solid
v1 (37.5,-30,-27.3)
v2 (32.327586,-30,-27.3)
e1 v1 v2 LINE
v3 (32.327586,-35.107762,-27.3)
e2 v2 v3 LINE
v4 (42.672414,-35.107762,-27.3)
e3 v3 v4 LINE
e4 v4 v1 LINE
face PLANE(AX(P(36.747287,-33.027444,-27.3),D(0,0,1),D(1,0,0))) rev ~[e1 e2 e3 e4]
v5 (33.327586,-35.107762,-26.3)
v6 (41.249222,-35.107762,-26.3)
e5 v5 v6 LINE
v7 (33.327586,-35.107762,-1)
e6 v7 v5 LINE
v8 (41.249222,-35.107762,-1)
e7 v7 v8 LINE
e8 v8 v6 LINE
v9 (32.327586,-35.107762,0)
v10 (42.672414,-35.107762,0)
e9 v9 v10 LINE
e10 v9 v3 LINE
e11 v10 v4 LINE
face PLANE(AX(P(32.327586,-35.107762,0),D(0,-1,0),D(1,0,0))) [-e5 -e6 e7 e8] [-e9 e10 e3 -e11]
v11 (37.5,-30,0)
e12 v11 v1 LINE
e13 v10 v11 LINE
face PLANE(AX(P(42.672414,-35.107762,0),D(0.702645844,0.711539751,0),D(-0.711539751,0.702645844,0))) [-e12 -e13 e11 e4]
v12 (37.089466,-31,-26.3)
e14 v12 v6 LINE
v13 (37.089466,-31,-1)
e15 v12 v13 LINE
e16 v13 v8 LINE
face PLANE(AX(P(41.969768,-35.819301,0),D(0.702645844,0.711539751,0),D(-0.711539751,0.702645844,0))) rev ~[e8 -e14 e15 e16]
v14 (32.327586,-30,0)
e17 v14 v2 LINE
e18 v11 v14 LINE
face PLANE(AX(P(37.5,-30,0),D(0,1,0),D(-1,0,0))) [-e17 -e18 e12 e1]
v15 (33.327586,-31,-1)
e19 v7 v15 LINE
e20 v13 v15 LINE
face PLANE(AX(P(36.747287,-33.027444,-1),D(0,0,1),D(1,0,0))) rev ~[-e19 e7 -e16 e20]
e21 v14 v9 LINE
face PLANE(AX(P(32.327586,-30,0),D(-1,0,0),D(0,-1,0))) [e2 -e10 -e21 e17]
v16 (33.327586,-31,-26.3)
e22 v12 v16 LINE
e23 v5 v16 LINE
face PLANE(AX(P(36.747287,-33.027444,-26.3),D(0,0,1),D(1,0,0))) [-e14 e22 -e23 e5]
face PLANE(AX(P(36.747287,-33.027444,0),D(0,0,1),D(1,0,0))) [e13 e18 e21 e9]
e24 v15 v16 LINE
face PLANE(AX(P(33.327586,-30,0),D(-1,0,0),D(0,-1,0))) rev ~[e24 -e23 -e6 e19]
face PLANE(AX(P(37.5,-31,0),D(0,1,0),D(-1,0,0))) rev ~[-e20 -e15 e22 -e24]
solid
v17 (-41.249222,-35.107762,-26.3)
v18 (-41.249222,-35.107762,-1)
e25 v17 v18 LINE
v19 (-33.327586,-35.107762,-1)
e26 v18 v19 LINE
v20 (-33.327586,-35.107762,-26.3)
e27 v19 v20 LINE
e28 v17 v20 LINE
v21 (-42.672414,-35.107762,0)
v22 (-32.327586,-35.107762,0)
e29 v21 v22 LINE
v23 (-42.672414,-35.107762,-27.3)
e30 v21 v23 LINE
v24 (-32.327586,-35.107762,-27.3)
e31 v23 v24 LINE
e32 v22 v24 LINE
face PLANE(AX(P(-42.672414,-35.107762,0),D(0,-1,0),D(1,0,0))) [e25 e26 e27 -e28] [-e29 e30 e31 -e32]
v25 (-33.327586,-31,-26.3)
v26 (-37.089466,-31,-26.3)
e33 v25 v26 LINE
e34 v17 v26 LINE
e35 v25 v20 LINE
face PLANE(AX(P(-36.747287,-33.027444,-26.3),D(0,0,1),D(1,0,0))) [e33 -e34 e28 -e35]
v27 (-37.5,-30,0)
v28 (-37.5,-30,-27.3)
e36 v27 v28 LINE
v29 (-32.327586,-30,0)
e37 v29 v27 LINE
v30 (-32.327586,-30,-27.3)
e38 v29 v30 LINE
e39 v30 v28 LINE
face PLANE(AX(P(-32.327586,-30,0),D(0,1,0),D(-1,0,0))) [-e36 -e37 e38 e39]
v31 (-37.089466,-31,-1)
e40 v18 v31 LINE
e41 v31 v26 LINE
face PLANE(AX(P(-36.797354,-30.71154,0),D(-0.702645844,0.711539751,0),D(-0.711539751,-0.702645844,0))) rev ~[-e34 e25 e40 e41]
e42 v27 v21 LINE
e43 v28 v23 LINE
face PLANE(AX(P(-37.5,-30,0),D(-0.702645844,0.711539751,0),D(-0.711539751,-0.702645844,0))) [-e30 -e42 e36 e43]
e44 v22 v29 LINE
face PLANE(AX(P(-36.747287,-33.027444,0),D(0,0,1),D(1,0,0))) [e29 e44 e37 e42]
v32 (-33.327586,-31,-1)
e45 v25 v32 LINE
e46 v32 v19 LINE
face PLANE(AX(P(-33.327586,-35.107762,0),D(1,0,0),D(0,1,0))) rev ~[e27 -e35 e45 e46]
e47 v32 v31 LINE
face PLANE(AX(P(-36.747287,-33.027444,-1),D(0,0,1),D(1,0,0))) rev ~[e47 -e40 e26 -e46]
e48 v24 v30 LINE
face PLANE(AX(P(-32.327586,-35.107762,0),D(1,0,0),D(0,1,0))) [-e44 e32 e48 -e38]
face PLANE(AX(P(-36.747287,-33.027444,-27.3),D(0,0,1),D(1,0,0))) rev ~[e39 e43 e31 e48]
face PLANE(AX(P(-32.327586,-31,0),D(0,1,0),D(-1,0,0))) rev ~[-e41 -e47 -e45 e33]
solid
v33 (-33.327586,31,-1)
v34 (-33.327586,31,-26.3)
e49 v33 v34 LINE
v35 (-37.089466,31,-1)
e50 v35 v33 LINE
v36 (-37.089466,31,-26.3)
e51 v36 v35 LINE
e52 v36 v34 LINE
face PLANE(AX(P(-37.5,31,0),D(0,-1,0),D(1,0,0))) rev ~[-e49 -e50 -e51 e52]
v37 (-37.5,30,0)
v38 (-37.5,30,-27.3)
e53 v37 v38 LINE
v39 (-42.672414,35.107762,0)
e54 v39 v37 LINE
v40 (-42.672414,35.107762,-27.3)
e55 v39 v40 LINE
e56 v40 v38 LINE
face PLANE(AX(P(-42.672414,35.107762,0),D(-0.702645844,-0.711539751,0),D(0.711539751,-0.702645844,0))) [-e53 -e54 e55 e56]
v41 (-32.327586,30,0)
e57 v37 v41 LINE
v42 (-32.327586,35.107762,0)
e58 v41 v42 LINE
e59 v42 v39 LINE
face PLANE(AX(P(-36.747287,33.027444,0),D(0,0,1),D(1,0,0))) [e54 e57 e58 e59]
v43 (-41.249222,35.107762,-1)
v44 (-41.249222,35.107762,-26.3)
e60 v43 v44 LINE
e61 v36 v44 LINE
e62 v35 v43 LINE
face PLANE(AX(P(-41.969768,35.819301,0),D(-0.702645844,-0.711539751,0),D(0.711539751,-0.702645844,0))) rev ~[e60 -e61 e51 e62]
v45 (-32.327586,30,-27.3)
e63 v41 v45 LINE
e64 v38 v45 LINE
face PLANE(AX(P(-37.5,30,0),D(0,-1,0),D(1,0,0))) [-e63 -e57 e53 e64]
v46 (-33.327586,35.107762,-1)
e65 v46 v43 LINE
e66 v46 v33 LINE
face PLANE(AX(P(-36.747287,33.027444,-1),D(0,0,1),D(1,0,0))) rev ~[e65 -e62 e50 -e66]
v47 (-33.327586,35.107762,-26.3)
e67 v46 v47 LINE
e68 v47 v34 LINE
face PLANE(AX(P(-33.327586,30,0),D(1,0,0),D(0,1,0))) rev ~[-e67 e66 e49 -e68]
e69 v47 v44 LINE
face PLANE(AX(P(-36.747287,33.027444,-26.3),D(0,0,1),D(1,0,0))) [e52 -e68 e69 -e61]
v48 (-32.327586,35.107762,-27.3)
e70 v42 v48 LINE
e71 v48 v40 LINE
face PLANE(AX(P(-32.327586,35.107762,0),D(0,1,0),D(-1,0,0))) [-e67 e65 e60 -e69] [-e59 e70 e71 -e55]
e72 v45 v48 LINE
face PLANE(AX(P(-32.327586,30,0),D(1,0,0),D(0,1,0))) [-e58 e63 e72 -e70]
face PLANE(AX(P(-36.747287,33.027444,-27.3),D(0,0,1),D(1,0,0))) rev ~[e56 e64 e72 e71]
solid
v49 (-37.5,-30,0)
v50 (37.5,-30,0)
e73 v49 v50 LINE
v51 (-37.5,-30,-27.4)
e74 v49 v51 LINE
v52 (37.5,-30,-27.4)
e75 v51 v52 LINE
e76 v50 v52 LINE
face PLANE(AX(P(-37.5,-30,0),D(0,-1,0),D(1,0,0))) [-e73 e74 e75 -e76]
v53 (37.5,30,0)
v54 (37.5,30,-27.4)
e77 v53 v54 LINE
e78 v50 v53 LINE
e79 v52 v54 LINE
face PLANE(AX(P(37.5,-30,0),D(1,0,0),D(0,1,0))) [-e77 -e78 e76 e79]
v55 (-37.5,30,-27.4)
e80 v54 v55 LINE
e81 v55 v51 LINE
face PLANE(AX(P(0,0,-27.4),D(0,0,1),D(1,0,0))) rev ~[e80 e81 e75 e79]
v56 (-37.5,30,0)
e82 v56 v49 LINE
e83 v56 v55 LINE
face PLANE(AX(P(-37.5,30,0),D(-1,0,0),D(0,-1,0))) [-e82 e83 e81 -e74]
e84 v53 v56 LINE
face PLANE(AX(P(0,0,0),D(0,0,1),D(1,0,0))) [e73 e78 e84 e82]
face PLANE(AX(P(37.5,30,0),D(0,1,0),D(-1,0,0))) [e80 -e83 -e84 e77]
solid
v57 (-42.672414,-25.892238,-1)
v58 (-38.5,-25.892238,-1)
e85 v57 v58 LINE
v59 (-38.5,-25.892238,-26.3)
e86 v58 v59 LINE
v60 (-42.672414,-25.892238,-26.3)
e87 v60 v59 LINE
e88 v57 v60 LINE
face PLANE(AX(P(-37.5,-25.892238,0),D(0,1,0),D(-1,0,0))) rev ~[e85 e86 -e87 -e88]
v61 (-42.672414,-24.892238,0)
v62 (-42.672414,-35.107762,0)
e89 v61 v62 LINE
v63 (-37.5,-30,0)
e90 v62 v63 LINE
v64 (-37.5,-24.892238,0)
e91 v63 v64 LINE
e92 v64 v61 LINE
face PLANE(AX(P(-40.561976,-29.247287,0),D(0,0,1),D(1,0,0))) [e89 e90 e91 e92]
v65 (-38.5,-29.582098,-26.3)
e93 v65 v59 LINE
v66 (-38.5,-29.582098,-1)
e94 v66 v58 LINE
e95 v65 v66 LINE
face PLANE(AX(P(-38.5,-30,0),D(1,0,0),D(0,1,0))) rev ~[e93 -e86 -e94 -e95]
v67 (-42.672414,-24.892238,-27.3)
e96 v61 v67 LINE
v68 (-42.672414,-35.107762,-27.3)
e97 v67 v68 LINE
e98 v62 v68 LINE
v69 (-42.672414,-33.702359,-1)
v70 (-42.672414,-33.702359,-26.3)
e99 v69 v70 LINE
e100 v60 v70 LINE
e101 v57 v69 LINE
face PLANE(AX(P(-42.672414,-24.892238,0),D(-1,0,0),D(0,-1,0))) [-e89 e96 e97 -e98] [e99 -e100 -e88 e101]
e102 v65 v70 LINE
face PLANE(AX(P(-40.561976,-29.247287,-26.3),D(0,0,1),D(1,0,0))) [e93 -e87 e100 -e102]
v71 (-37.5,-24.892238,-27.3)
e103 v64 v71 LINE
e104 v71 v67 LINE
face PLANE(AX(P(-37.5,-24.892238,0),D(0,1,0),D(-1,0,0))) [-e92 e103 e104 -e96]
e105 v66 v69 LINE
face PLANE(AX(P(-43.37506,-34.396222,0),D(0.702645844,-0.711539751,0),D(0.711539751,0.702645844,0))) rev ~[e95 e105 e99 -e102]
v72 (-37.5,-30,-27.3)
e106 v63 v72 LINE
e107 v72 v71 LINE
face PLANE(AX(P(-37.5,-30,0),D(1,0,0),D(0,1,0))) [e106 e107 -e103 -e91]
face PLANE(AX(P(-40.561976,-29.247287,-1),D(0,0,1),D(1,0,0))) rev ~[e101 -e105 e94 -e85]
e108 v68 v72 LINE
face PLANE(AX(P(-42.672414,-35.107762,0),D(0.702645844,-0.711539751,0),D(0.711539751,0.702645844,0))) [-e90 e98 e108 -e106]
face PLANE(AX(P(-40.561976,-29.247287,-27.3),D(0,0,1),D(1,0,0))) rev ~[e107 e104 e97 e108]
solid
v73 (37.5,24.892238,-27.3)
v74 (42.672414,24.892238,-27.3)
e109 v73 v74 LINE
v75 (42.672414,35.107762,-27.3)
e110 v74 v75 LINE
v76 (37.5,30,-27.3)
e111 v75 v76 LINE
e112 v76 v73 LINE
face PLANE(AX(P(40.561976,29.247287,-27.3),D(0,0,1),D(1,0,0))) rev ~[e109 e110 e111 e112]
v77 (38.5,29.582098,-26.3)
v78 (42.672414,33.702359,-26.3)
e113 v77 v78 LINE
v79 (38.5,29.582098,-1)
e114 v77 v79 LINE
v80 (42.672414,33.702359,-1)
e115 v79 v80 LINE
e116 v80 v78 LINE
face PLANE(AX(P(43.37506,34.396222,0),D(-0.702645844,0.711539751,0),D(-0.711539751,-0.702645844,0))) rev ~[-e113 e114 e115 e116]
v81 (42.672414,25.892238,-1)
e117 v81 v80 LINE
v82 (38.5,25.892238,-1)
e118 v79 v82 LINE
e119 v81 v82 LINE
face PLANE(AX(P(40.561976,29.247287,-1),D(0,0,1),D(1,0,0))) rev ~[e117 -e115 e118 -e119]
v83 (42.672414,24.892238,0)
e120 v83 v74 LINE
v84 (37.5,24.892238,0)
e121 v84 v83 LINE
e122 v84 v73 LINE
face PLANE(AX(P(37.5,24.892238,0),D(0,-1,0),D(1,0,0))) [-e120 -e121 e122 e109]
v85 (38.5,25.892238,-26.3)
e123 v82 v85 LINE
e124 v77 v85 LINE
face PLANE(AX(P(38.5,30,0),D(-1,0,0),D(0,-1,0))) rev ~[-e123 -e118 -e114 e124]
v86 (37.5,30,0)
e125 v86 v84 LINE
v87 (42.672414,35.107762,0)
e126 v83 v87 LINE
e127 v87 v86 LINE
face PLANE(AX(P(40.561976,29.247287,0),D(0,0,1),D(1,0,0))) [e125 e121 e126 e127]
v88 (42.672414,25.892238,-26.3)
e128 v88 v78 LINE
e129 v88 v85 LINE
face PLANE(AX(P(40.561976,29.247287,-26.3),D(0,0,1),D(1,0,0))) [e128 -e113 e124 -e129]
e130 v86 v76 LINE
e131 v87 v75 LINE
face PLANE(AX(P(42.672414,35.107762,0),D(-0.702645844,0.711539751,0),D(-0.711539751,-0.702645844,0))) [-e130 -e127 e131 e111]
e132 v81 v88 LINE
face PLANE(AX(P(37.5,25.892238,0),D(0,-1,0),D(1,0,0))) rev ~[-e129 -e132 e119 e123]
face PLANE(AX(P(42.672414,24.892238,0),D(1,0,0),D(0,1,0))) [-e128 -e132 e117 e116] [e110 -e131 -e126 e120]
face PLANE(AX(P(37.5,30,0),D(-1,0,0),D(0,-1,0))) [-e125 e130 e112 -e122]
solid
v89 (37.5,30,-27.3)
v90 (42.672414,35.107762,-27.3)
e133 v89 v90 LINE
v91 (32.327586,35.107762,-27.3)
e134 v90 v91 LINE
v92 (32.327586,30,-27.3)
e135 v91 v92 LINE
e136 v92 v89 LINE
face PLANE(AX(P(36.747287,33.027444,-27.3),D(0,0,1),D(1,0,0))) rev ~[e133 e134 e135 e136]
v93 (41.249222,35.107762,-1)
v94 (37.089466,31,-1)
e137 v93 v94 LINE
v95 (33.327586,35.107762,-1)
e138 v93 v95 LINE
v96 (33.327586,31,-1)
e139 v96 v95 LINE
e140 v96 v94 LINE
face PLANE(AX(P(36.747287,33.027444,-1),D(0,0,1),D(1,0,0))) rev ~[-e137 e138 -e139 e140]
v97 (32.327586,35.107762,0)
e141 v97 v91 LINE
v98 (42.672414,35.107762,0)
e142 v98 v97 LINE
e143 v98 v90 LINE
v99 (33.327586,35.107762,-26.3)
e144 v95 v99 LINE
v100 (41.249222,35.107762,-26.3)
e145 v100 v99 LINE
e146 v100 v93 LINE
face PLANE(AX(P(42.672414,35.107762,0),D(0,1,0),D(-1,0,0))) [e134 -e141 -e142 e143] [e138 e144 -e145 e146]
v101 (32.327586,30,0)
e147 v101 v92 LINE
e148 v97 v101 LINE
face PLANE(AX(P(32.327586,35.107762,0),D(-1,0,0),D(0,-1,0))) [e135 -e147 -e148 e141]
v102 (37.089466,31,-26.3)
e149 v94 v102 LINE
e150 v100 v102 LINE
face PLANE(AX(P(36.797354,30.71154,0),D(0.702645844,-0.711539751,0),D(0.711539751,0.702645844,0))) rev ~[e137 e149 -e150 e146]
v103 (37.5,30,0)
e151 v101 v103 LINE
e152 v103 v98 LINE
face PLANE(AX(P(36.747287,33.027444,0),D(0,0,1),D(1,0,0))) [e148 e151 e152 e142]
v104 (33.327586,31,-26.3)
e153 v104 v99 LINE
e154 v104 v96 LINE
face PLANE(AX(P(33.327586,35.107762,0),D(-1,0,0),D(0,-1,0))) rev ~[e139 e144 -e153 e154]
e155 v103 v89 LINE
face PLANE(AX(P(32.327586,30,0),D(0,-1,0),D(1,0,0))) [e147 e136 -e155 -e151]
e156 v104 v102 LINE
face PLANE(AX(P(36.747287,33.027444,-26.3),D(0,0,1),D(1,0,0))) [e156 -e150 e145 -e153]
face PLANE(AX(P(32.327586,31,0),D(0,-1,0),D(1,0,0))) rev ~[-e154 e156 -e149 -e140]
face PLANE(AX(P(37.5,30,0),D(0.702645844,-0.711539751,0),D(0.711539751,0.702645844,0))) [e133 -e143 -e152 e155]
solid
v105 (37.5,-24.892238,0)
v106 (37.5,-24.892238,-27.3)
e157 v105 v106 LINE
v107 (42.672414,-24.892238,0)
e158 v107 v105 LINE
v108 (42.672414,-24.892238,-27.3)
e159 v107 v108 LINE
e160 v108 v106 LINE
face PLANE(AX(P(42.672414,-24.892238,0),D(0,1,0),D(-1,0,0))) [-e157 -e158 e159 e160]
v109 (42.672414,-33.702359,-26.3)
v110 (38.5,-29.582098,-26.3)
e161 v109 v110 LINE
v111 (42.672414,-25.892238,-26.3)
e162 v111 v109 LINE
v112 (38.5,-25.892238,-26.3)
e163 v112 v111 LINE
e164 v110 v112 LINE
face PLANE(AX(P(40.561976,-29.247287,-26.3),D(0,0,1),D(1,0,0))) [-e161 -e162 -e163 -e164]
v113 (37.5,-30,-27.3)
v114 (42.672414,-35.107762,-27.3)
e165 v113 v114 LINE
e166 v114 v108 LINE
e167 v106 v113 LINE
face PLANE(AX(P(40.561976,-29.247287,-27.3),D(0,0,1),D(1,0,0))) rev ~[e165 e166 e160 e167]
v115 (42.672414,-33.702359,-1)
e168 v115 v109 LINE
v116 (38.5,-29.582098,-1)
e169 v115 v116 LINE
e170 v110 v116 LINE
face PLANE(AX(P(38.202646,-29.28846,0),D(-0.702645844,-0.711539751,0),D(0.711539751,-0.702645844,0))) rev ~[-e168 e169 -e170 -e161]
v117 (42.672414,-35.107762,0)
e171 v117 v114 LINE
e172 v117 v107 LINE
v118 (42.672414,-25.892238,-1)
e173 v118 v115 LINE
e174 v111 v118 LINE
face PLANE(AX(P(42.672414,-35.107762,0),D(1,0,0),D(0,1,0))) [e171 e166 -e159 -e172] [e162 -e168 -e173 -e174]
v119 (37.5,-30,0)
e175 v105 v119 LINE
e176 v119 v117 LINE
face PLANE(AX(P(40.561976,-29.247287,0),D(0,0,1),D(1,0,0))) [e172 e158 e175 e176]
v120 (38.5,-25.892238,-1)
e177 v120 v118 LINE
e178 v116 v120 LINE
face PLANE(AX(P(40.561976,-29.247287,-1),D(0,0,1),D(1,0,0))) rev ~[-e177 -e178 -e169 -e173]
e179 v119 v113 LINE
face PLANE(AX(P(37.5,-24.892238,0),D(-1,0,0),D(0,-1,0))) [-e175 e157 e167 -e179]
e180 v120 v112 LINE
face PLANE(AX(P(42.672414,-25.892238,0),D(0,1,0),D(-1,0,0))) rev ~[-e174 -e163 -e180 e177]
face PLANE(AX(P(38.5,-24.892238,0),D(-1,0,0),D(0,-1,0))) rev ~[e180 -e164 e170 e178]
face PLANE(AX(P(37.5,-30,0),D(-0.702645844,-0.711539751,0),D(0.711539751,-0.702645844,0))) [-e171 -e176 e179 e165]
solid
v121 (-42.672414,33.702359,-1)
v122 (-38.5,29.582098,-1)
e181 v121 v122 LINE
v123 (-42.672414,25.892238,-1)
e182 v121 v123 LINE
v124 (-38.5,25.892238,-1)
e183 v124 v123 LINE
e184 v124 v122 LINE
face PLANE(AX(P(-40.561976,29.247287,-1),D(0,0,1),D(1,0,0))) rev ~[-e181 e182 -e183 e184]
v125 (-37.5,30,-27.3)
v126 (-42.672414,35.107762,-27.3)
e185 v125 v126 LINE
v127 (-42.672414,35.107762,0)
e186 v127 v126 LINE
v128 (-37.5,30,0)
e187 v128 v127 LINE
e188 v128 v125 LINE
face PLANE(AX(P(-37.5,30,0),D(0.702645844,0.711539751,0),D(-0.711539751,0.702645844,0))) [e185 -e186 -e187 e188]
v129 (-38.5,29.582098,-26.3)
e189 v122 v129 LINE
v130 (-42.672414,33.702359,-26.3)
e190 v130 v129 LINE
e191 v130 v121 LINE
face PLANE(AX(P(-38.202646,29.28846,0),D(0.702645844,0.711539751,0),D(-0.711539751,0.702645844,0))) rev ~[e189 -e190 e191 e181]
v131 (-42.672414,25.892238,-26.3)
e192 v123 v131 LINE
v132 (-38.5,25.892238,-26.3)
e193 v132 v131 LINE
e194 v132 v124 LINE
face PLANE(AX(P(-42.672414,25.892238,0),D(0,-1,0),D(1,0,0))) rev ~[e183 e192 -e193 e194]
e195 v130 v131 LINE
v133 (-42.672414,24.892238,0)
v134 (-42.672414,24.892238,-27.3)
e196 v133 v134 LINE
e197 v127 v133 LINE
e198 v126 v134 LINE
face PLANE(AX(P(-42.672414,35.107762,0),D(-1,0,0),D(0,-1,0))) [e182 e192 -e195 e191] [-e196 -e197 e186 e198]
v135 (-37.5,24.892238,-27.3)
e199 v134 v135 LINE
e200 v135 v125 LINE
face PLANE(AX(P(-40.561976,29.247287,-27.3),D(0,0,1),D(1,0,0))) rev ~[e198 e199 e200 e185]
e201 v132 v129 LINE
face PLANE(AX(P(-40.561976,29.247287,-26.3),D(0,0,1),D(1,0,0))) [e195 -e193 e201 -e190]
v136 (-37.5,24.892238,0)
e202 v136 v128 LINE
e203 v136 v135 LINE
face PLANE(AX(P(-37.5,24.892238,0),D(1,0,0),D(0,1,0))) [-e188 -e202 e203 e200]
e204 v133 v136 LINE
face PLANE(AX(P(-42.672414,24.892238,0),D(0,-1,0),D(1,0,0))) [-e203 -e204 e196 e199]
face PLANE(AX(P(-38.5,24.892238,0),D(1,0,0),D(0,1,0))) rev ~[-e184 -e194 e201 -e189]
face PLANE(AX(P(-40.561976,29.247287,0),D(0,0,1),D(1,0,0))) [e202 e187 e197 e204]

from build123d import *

# Parameters (mm, degrees)
F0_W     = 5.1724143326
F0_H     = 5.1077616215
F1_DEPTH = 27.4
F2_DEPTH = 27.3
F3_DEPTH = 27.3
F4_T     = -1
F4_2_T   = -1
F4_3_T   = -1
F4_4_T   = -1
F4_5_T   = -1
F4_6_T   = -1
F4_7_T   = -1
F4_8_T   = -1


# Not quite as in the source:
# - the program builds the solid bodies; features that only make, move or delete a surface that nothing else refers to are left out


with BuildPart() as f1:
    # F0 (on Top) → F1 (new body)
    with BuildSketch(Plane.XY):
        Polygon((-32.3275856674, -30), (32.3275856674, -30), (32.3275856674, -24.8922383785), (37.5, -24.8922383785), (37.5, 24.8922383785), (32.3275856674, 24.8922383785), (32.3275856674, 30), (-32.3275856674, 30), (-32.3275856674, 24.8922383785), (-37.5, 24.8922383785), (-37.5, -24.8922383785), (-32.3275856674, -24.8922383785), align=None)
        with Locations((-34.9137928337, 27.4461191893)):
            Rectangle(F0_W, F0_H)
        with Locations((34.9137928337, 27.4461191893)):
            Rectangle(F0_W, F0_H)
        with Locations((34.9137928337, -27.4461191893)):
            Rectangle(F0_W, F0_H)
        with Locations((-34.9137928337, -27.4461191893)):
            Rectangle(F0_W, F0_H)
    extrude(amount=-F1_DEPTH)


with BuildPart() as f2:
    # F0 (on Top) → F2 (new body)
    with BuildSketch(Plane.XY):
        Polygon((-42.6724143326, 24.8922383785), (-37.5, 24.8922383785), (-37.5, 30), (-42.6724143326, 35.1077616215), align=None)
    extrude(amount=-F2_DEPTH)

    # F4#7
    f4_7_openings = [f2.faces().sort_by_distance(p)[0] for p in [
        (-42.672414, 30, -13.65),
    ]]
    offset(amount=F4_7_T, openings=f4_7_openings)


with BuildPart() as f2b:
    # F0 (on Top) → F2, piece 2 (new body)
    with BuildSketch(Plane.XY):
        Polygon((32.3275856674, 30), (37.5, 30), (42.6724143326, 35.1077616215), (32.3275856674, 35.1077616215), align=None)
    extrude(amount=-F2_DEPTH)

    # F4#3
    f4_3_openings = [f2b.faces().sort_by_distance(p)[0] for p in [
        (37.5, 35.107762, -13.65),
    ]]
    offset(amount=F4_3_T, openings=f4_3_openings)


with BuildPart() as f2c:
    # F0 (on Top) → F2, piece 3 (new body)
    with BuildSketch(Plane.XY):
        Polygon((37.5, -24.8922383785), (37.5, -30), (42.6724143326, -35.1077616215), (42.6724143326, -24.8922383785), align=None)
    extrude(amount=-F2_DEPTH)

    # F4
    f4_openings = [f2c.faces().sort_by_distance(p)[0] for p in [
        (42.672414, -30, -13.65),
    ]]
    offset(amount=F4_T, openings=f4_openings, kind=Kind.INTERSECTION)


with BuildPart() as f2d:
    # F0 (on Top) → F2, piece 4 (new body)
    with BuildSketch(Plane.XY):
        Polygon((-42.6724143326, -35.1077616215), (-37.5, -30), (-37.5, -24.8922383785), (-42.6724143326, -24.8922383785), align=None)
    extrude(amount=-F2_DEPTH)

    # F4#5
    f4_5_openings = [f2d.faces().sort_by_distance(p)[0] for p in [
        (-42.672414, -30, -13.65),
    ]]
    offset(amount=F4_5_T, openings=f4_5_openings)


with BuildPart() as f3:
    # F0 (on Top) → F3 (new body)
    with BuildSketch(Plane.XY):
        Polygon((-37.5, 30), (-32.3275856674, 30), (-32.3275856674, 35.1077616215), (-42.6724143326, 35.1077616215), align=None)
    extrude(amount=-F3_DEPTH)

    # F4#4
    f4_4_openings = [f3.faces().sort_by_distance(p)[0] for p in [
        (-37.5, 35.107762, -13.65),
    ]]
    offset(amount=F4_4_T, openings=f4_4_openings)


with BuildPart() as f3b:
    # F0 (on Top) → F3, piece 2 (new body)
    with BuildSketch(Plane.XY):
        Polygon((37.5, 30), (37.5, 24.8922383785), (42.6724143326, 24.8922383785), (42.6724143326, 35.1077616215), align=None)
    extrude(amount=-F3_DEPTH)

    # F4#2
    f4_2_openings = [f3b.faces().sort_by_distance(p)[0] for p in [
        (42.672414, 30, -13.65),
    ]]
    offset(amount=F4_2_T, openings=f4_2_openings)


with BuildPart() as f3c:
    # F0 (on Top) → F3, piece 3 (new body)
    with BuildSketch(Plane.XY):
        Polygon((42.6724143326, -35.1077616215), (37.5, -30), (32.3275856674, -30), (32.3275856674, -35.1077616215), align=None)
    extrude(amount=-F3_DEPTH)

    # F4#8
    f4_8_openings = [f3c.faces().sort_by_distance(p)[0] for p in [
        (37.5, -35.107762, -13.65),
    ]]
    offset(amount=F4_8_T, openings=f4_8_openings)


with BuildPart() as f3d:
    # F0 (on Top) → F3, piece 4 (new body)
    with BuildSketch(Plane.XY):
        Polygon((-32.3275856674, -35.1077616215), (-32.3275856674, -30), (-37.5, -30), (-42.6724143326, -35.1077616215), align=None)
    extrude(amount=-F3_DEPTH)

    # F4#6
    f4_6_openings = [f3d.faces().sort_by_distance(p)[0] for p in [
        (-37.5, -35.107762, -13.65),
    ]]
    offset(amount=F4_6_T, openings=f4_6_openings)


solid = Compound([f1.part, f2.part, f2b.part, f2c.part, f2d.part, f3.part, f3b.part, f3c.part, f3d.part])
